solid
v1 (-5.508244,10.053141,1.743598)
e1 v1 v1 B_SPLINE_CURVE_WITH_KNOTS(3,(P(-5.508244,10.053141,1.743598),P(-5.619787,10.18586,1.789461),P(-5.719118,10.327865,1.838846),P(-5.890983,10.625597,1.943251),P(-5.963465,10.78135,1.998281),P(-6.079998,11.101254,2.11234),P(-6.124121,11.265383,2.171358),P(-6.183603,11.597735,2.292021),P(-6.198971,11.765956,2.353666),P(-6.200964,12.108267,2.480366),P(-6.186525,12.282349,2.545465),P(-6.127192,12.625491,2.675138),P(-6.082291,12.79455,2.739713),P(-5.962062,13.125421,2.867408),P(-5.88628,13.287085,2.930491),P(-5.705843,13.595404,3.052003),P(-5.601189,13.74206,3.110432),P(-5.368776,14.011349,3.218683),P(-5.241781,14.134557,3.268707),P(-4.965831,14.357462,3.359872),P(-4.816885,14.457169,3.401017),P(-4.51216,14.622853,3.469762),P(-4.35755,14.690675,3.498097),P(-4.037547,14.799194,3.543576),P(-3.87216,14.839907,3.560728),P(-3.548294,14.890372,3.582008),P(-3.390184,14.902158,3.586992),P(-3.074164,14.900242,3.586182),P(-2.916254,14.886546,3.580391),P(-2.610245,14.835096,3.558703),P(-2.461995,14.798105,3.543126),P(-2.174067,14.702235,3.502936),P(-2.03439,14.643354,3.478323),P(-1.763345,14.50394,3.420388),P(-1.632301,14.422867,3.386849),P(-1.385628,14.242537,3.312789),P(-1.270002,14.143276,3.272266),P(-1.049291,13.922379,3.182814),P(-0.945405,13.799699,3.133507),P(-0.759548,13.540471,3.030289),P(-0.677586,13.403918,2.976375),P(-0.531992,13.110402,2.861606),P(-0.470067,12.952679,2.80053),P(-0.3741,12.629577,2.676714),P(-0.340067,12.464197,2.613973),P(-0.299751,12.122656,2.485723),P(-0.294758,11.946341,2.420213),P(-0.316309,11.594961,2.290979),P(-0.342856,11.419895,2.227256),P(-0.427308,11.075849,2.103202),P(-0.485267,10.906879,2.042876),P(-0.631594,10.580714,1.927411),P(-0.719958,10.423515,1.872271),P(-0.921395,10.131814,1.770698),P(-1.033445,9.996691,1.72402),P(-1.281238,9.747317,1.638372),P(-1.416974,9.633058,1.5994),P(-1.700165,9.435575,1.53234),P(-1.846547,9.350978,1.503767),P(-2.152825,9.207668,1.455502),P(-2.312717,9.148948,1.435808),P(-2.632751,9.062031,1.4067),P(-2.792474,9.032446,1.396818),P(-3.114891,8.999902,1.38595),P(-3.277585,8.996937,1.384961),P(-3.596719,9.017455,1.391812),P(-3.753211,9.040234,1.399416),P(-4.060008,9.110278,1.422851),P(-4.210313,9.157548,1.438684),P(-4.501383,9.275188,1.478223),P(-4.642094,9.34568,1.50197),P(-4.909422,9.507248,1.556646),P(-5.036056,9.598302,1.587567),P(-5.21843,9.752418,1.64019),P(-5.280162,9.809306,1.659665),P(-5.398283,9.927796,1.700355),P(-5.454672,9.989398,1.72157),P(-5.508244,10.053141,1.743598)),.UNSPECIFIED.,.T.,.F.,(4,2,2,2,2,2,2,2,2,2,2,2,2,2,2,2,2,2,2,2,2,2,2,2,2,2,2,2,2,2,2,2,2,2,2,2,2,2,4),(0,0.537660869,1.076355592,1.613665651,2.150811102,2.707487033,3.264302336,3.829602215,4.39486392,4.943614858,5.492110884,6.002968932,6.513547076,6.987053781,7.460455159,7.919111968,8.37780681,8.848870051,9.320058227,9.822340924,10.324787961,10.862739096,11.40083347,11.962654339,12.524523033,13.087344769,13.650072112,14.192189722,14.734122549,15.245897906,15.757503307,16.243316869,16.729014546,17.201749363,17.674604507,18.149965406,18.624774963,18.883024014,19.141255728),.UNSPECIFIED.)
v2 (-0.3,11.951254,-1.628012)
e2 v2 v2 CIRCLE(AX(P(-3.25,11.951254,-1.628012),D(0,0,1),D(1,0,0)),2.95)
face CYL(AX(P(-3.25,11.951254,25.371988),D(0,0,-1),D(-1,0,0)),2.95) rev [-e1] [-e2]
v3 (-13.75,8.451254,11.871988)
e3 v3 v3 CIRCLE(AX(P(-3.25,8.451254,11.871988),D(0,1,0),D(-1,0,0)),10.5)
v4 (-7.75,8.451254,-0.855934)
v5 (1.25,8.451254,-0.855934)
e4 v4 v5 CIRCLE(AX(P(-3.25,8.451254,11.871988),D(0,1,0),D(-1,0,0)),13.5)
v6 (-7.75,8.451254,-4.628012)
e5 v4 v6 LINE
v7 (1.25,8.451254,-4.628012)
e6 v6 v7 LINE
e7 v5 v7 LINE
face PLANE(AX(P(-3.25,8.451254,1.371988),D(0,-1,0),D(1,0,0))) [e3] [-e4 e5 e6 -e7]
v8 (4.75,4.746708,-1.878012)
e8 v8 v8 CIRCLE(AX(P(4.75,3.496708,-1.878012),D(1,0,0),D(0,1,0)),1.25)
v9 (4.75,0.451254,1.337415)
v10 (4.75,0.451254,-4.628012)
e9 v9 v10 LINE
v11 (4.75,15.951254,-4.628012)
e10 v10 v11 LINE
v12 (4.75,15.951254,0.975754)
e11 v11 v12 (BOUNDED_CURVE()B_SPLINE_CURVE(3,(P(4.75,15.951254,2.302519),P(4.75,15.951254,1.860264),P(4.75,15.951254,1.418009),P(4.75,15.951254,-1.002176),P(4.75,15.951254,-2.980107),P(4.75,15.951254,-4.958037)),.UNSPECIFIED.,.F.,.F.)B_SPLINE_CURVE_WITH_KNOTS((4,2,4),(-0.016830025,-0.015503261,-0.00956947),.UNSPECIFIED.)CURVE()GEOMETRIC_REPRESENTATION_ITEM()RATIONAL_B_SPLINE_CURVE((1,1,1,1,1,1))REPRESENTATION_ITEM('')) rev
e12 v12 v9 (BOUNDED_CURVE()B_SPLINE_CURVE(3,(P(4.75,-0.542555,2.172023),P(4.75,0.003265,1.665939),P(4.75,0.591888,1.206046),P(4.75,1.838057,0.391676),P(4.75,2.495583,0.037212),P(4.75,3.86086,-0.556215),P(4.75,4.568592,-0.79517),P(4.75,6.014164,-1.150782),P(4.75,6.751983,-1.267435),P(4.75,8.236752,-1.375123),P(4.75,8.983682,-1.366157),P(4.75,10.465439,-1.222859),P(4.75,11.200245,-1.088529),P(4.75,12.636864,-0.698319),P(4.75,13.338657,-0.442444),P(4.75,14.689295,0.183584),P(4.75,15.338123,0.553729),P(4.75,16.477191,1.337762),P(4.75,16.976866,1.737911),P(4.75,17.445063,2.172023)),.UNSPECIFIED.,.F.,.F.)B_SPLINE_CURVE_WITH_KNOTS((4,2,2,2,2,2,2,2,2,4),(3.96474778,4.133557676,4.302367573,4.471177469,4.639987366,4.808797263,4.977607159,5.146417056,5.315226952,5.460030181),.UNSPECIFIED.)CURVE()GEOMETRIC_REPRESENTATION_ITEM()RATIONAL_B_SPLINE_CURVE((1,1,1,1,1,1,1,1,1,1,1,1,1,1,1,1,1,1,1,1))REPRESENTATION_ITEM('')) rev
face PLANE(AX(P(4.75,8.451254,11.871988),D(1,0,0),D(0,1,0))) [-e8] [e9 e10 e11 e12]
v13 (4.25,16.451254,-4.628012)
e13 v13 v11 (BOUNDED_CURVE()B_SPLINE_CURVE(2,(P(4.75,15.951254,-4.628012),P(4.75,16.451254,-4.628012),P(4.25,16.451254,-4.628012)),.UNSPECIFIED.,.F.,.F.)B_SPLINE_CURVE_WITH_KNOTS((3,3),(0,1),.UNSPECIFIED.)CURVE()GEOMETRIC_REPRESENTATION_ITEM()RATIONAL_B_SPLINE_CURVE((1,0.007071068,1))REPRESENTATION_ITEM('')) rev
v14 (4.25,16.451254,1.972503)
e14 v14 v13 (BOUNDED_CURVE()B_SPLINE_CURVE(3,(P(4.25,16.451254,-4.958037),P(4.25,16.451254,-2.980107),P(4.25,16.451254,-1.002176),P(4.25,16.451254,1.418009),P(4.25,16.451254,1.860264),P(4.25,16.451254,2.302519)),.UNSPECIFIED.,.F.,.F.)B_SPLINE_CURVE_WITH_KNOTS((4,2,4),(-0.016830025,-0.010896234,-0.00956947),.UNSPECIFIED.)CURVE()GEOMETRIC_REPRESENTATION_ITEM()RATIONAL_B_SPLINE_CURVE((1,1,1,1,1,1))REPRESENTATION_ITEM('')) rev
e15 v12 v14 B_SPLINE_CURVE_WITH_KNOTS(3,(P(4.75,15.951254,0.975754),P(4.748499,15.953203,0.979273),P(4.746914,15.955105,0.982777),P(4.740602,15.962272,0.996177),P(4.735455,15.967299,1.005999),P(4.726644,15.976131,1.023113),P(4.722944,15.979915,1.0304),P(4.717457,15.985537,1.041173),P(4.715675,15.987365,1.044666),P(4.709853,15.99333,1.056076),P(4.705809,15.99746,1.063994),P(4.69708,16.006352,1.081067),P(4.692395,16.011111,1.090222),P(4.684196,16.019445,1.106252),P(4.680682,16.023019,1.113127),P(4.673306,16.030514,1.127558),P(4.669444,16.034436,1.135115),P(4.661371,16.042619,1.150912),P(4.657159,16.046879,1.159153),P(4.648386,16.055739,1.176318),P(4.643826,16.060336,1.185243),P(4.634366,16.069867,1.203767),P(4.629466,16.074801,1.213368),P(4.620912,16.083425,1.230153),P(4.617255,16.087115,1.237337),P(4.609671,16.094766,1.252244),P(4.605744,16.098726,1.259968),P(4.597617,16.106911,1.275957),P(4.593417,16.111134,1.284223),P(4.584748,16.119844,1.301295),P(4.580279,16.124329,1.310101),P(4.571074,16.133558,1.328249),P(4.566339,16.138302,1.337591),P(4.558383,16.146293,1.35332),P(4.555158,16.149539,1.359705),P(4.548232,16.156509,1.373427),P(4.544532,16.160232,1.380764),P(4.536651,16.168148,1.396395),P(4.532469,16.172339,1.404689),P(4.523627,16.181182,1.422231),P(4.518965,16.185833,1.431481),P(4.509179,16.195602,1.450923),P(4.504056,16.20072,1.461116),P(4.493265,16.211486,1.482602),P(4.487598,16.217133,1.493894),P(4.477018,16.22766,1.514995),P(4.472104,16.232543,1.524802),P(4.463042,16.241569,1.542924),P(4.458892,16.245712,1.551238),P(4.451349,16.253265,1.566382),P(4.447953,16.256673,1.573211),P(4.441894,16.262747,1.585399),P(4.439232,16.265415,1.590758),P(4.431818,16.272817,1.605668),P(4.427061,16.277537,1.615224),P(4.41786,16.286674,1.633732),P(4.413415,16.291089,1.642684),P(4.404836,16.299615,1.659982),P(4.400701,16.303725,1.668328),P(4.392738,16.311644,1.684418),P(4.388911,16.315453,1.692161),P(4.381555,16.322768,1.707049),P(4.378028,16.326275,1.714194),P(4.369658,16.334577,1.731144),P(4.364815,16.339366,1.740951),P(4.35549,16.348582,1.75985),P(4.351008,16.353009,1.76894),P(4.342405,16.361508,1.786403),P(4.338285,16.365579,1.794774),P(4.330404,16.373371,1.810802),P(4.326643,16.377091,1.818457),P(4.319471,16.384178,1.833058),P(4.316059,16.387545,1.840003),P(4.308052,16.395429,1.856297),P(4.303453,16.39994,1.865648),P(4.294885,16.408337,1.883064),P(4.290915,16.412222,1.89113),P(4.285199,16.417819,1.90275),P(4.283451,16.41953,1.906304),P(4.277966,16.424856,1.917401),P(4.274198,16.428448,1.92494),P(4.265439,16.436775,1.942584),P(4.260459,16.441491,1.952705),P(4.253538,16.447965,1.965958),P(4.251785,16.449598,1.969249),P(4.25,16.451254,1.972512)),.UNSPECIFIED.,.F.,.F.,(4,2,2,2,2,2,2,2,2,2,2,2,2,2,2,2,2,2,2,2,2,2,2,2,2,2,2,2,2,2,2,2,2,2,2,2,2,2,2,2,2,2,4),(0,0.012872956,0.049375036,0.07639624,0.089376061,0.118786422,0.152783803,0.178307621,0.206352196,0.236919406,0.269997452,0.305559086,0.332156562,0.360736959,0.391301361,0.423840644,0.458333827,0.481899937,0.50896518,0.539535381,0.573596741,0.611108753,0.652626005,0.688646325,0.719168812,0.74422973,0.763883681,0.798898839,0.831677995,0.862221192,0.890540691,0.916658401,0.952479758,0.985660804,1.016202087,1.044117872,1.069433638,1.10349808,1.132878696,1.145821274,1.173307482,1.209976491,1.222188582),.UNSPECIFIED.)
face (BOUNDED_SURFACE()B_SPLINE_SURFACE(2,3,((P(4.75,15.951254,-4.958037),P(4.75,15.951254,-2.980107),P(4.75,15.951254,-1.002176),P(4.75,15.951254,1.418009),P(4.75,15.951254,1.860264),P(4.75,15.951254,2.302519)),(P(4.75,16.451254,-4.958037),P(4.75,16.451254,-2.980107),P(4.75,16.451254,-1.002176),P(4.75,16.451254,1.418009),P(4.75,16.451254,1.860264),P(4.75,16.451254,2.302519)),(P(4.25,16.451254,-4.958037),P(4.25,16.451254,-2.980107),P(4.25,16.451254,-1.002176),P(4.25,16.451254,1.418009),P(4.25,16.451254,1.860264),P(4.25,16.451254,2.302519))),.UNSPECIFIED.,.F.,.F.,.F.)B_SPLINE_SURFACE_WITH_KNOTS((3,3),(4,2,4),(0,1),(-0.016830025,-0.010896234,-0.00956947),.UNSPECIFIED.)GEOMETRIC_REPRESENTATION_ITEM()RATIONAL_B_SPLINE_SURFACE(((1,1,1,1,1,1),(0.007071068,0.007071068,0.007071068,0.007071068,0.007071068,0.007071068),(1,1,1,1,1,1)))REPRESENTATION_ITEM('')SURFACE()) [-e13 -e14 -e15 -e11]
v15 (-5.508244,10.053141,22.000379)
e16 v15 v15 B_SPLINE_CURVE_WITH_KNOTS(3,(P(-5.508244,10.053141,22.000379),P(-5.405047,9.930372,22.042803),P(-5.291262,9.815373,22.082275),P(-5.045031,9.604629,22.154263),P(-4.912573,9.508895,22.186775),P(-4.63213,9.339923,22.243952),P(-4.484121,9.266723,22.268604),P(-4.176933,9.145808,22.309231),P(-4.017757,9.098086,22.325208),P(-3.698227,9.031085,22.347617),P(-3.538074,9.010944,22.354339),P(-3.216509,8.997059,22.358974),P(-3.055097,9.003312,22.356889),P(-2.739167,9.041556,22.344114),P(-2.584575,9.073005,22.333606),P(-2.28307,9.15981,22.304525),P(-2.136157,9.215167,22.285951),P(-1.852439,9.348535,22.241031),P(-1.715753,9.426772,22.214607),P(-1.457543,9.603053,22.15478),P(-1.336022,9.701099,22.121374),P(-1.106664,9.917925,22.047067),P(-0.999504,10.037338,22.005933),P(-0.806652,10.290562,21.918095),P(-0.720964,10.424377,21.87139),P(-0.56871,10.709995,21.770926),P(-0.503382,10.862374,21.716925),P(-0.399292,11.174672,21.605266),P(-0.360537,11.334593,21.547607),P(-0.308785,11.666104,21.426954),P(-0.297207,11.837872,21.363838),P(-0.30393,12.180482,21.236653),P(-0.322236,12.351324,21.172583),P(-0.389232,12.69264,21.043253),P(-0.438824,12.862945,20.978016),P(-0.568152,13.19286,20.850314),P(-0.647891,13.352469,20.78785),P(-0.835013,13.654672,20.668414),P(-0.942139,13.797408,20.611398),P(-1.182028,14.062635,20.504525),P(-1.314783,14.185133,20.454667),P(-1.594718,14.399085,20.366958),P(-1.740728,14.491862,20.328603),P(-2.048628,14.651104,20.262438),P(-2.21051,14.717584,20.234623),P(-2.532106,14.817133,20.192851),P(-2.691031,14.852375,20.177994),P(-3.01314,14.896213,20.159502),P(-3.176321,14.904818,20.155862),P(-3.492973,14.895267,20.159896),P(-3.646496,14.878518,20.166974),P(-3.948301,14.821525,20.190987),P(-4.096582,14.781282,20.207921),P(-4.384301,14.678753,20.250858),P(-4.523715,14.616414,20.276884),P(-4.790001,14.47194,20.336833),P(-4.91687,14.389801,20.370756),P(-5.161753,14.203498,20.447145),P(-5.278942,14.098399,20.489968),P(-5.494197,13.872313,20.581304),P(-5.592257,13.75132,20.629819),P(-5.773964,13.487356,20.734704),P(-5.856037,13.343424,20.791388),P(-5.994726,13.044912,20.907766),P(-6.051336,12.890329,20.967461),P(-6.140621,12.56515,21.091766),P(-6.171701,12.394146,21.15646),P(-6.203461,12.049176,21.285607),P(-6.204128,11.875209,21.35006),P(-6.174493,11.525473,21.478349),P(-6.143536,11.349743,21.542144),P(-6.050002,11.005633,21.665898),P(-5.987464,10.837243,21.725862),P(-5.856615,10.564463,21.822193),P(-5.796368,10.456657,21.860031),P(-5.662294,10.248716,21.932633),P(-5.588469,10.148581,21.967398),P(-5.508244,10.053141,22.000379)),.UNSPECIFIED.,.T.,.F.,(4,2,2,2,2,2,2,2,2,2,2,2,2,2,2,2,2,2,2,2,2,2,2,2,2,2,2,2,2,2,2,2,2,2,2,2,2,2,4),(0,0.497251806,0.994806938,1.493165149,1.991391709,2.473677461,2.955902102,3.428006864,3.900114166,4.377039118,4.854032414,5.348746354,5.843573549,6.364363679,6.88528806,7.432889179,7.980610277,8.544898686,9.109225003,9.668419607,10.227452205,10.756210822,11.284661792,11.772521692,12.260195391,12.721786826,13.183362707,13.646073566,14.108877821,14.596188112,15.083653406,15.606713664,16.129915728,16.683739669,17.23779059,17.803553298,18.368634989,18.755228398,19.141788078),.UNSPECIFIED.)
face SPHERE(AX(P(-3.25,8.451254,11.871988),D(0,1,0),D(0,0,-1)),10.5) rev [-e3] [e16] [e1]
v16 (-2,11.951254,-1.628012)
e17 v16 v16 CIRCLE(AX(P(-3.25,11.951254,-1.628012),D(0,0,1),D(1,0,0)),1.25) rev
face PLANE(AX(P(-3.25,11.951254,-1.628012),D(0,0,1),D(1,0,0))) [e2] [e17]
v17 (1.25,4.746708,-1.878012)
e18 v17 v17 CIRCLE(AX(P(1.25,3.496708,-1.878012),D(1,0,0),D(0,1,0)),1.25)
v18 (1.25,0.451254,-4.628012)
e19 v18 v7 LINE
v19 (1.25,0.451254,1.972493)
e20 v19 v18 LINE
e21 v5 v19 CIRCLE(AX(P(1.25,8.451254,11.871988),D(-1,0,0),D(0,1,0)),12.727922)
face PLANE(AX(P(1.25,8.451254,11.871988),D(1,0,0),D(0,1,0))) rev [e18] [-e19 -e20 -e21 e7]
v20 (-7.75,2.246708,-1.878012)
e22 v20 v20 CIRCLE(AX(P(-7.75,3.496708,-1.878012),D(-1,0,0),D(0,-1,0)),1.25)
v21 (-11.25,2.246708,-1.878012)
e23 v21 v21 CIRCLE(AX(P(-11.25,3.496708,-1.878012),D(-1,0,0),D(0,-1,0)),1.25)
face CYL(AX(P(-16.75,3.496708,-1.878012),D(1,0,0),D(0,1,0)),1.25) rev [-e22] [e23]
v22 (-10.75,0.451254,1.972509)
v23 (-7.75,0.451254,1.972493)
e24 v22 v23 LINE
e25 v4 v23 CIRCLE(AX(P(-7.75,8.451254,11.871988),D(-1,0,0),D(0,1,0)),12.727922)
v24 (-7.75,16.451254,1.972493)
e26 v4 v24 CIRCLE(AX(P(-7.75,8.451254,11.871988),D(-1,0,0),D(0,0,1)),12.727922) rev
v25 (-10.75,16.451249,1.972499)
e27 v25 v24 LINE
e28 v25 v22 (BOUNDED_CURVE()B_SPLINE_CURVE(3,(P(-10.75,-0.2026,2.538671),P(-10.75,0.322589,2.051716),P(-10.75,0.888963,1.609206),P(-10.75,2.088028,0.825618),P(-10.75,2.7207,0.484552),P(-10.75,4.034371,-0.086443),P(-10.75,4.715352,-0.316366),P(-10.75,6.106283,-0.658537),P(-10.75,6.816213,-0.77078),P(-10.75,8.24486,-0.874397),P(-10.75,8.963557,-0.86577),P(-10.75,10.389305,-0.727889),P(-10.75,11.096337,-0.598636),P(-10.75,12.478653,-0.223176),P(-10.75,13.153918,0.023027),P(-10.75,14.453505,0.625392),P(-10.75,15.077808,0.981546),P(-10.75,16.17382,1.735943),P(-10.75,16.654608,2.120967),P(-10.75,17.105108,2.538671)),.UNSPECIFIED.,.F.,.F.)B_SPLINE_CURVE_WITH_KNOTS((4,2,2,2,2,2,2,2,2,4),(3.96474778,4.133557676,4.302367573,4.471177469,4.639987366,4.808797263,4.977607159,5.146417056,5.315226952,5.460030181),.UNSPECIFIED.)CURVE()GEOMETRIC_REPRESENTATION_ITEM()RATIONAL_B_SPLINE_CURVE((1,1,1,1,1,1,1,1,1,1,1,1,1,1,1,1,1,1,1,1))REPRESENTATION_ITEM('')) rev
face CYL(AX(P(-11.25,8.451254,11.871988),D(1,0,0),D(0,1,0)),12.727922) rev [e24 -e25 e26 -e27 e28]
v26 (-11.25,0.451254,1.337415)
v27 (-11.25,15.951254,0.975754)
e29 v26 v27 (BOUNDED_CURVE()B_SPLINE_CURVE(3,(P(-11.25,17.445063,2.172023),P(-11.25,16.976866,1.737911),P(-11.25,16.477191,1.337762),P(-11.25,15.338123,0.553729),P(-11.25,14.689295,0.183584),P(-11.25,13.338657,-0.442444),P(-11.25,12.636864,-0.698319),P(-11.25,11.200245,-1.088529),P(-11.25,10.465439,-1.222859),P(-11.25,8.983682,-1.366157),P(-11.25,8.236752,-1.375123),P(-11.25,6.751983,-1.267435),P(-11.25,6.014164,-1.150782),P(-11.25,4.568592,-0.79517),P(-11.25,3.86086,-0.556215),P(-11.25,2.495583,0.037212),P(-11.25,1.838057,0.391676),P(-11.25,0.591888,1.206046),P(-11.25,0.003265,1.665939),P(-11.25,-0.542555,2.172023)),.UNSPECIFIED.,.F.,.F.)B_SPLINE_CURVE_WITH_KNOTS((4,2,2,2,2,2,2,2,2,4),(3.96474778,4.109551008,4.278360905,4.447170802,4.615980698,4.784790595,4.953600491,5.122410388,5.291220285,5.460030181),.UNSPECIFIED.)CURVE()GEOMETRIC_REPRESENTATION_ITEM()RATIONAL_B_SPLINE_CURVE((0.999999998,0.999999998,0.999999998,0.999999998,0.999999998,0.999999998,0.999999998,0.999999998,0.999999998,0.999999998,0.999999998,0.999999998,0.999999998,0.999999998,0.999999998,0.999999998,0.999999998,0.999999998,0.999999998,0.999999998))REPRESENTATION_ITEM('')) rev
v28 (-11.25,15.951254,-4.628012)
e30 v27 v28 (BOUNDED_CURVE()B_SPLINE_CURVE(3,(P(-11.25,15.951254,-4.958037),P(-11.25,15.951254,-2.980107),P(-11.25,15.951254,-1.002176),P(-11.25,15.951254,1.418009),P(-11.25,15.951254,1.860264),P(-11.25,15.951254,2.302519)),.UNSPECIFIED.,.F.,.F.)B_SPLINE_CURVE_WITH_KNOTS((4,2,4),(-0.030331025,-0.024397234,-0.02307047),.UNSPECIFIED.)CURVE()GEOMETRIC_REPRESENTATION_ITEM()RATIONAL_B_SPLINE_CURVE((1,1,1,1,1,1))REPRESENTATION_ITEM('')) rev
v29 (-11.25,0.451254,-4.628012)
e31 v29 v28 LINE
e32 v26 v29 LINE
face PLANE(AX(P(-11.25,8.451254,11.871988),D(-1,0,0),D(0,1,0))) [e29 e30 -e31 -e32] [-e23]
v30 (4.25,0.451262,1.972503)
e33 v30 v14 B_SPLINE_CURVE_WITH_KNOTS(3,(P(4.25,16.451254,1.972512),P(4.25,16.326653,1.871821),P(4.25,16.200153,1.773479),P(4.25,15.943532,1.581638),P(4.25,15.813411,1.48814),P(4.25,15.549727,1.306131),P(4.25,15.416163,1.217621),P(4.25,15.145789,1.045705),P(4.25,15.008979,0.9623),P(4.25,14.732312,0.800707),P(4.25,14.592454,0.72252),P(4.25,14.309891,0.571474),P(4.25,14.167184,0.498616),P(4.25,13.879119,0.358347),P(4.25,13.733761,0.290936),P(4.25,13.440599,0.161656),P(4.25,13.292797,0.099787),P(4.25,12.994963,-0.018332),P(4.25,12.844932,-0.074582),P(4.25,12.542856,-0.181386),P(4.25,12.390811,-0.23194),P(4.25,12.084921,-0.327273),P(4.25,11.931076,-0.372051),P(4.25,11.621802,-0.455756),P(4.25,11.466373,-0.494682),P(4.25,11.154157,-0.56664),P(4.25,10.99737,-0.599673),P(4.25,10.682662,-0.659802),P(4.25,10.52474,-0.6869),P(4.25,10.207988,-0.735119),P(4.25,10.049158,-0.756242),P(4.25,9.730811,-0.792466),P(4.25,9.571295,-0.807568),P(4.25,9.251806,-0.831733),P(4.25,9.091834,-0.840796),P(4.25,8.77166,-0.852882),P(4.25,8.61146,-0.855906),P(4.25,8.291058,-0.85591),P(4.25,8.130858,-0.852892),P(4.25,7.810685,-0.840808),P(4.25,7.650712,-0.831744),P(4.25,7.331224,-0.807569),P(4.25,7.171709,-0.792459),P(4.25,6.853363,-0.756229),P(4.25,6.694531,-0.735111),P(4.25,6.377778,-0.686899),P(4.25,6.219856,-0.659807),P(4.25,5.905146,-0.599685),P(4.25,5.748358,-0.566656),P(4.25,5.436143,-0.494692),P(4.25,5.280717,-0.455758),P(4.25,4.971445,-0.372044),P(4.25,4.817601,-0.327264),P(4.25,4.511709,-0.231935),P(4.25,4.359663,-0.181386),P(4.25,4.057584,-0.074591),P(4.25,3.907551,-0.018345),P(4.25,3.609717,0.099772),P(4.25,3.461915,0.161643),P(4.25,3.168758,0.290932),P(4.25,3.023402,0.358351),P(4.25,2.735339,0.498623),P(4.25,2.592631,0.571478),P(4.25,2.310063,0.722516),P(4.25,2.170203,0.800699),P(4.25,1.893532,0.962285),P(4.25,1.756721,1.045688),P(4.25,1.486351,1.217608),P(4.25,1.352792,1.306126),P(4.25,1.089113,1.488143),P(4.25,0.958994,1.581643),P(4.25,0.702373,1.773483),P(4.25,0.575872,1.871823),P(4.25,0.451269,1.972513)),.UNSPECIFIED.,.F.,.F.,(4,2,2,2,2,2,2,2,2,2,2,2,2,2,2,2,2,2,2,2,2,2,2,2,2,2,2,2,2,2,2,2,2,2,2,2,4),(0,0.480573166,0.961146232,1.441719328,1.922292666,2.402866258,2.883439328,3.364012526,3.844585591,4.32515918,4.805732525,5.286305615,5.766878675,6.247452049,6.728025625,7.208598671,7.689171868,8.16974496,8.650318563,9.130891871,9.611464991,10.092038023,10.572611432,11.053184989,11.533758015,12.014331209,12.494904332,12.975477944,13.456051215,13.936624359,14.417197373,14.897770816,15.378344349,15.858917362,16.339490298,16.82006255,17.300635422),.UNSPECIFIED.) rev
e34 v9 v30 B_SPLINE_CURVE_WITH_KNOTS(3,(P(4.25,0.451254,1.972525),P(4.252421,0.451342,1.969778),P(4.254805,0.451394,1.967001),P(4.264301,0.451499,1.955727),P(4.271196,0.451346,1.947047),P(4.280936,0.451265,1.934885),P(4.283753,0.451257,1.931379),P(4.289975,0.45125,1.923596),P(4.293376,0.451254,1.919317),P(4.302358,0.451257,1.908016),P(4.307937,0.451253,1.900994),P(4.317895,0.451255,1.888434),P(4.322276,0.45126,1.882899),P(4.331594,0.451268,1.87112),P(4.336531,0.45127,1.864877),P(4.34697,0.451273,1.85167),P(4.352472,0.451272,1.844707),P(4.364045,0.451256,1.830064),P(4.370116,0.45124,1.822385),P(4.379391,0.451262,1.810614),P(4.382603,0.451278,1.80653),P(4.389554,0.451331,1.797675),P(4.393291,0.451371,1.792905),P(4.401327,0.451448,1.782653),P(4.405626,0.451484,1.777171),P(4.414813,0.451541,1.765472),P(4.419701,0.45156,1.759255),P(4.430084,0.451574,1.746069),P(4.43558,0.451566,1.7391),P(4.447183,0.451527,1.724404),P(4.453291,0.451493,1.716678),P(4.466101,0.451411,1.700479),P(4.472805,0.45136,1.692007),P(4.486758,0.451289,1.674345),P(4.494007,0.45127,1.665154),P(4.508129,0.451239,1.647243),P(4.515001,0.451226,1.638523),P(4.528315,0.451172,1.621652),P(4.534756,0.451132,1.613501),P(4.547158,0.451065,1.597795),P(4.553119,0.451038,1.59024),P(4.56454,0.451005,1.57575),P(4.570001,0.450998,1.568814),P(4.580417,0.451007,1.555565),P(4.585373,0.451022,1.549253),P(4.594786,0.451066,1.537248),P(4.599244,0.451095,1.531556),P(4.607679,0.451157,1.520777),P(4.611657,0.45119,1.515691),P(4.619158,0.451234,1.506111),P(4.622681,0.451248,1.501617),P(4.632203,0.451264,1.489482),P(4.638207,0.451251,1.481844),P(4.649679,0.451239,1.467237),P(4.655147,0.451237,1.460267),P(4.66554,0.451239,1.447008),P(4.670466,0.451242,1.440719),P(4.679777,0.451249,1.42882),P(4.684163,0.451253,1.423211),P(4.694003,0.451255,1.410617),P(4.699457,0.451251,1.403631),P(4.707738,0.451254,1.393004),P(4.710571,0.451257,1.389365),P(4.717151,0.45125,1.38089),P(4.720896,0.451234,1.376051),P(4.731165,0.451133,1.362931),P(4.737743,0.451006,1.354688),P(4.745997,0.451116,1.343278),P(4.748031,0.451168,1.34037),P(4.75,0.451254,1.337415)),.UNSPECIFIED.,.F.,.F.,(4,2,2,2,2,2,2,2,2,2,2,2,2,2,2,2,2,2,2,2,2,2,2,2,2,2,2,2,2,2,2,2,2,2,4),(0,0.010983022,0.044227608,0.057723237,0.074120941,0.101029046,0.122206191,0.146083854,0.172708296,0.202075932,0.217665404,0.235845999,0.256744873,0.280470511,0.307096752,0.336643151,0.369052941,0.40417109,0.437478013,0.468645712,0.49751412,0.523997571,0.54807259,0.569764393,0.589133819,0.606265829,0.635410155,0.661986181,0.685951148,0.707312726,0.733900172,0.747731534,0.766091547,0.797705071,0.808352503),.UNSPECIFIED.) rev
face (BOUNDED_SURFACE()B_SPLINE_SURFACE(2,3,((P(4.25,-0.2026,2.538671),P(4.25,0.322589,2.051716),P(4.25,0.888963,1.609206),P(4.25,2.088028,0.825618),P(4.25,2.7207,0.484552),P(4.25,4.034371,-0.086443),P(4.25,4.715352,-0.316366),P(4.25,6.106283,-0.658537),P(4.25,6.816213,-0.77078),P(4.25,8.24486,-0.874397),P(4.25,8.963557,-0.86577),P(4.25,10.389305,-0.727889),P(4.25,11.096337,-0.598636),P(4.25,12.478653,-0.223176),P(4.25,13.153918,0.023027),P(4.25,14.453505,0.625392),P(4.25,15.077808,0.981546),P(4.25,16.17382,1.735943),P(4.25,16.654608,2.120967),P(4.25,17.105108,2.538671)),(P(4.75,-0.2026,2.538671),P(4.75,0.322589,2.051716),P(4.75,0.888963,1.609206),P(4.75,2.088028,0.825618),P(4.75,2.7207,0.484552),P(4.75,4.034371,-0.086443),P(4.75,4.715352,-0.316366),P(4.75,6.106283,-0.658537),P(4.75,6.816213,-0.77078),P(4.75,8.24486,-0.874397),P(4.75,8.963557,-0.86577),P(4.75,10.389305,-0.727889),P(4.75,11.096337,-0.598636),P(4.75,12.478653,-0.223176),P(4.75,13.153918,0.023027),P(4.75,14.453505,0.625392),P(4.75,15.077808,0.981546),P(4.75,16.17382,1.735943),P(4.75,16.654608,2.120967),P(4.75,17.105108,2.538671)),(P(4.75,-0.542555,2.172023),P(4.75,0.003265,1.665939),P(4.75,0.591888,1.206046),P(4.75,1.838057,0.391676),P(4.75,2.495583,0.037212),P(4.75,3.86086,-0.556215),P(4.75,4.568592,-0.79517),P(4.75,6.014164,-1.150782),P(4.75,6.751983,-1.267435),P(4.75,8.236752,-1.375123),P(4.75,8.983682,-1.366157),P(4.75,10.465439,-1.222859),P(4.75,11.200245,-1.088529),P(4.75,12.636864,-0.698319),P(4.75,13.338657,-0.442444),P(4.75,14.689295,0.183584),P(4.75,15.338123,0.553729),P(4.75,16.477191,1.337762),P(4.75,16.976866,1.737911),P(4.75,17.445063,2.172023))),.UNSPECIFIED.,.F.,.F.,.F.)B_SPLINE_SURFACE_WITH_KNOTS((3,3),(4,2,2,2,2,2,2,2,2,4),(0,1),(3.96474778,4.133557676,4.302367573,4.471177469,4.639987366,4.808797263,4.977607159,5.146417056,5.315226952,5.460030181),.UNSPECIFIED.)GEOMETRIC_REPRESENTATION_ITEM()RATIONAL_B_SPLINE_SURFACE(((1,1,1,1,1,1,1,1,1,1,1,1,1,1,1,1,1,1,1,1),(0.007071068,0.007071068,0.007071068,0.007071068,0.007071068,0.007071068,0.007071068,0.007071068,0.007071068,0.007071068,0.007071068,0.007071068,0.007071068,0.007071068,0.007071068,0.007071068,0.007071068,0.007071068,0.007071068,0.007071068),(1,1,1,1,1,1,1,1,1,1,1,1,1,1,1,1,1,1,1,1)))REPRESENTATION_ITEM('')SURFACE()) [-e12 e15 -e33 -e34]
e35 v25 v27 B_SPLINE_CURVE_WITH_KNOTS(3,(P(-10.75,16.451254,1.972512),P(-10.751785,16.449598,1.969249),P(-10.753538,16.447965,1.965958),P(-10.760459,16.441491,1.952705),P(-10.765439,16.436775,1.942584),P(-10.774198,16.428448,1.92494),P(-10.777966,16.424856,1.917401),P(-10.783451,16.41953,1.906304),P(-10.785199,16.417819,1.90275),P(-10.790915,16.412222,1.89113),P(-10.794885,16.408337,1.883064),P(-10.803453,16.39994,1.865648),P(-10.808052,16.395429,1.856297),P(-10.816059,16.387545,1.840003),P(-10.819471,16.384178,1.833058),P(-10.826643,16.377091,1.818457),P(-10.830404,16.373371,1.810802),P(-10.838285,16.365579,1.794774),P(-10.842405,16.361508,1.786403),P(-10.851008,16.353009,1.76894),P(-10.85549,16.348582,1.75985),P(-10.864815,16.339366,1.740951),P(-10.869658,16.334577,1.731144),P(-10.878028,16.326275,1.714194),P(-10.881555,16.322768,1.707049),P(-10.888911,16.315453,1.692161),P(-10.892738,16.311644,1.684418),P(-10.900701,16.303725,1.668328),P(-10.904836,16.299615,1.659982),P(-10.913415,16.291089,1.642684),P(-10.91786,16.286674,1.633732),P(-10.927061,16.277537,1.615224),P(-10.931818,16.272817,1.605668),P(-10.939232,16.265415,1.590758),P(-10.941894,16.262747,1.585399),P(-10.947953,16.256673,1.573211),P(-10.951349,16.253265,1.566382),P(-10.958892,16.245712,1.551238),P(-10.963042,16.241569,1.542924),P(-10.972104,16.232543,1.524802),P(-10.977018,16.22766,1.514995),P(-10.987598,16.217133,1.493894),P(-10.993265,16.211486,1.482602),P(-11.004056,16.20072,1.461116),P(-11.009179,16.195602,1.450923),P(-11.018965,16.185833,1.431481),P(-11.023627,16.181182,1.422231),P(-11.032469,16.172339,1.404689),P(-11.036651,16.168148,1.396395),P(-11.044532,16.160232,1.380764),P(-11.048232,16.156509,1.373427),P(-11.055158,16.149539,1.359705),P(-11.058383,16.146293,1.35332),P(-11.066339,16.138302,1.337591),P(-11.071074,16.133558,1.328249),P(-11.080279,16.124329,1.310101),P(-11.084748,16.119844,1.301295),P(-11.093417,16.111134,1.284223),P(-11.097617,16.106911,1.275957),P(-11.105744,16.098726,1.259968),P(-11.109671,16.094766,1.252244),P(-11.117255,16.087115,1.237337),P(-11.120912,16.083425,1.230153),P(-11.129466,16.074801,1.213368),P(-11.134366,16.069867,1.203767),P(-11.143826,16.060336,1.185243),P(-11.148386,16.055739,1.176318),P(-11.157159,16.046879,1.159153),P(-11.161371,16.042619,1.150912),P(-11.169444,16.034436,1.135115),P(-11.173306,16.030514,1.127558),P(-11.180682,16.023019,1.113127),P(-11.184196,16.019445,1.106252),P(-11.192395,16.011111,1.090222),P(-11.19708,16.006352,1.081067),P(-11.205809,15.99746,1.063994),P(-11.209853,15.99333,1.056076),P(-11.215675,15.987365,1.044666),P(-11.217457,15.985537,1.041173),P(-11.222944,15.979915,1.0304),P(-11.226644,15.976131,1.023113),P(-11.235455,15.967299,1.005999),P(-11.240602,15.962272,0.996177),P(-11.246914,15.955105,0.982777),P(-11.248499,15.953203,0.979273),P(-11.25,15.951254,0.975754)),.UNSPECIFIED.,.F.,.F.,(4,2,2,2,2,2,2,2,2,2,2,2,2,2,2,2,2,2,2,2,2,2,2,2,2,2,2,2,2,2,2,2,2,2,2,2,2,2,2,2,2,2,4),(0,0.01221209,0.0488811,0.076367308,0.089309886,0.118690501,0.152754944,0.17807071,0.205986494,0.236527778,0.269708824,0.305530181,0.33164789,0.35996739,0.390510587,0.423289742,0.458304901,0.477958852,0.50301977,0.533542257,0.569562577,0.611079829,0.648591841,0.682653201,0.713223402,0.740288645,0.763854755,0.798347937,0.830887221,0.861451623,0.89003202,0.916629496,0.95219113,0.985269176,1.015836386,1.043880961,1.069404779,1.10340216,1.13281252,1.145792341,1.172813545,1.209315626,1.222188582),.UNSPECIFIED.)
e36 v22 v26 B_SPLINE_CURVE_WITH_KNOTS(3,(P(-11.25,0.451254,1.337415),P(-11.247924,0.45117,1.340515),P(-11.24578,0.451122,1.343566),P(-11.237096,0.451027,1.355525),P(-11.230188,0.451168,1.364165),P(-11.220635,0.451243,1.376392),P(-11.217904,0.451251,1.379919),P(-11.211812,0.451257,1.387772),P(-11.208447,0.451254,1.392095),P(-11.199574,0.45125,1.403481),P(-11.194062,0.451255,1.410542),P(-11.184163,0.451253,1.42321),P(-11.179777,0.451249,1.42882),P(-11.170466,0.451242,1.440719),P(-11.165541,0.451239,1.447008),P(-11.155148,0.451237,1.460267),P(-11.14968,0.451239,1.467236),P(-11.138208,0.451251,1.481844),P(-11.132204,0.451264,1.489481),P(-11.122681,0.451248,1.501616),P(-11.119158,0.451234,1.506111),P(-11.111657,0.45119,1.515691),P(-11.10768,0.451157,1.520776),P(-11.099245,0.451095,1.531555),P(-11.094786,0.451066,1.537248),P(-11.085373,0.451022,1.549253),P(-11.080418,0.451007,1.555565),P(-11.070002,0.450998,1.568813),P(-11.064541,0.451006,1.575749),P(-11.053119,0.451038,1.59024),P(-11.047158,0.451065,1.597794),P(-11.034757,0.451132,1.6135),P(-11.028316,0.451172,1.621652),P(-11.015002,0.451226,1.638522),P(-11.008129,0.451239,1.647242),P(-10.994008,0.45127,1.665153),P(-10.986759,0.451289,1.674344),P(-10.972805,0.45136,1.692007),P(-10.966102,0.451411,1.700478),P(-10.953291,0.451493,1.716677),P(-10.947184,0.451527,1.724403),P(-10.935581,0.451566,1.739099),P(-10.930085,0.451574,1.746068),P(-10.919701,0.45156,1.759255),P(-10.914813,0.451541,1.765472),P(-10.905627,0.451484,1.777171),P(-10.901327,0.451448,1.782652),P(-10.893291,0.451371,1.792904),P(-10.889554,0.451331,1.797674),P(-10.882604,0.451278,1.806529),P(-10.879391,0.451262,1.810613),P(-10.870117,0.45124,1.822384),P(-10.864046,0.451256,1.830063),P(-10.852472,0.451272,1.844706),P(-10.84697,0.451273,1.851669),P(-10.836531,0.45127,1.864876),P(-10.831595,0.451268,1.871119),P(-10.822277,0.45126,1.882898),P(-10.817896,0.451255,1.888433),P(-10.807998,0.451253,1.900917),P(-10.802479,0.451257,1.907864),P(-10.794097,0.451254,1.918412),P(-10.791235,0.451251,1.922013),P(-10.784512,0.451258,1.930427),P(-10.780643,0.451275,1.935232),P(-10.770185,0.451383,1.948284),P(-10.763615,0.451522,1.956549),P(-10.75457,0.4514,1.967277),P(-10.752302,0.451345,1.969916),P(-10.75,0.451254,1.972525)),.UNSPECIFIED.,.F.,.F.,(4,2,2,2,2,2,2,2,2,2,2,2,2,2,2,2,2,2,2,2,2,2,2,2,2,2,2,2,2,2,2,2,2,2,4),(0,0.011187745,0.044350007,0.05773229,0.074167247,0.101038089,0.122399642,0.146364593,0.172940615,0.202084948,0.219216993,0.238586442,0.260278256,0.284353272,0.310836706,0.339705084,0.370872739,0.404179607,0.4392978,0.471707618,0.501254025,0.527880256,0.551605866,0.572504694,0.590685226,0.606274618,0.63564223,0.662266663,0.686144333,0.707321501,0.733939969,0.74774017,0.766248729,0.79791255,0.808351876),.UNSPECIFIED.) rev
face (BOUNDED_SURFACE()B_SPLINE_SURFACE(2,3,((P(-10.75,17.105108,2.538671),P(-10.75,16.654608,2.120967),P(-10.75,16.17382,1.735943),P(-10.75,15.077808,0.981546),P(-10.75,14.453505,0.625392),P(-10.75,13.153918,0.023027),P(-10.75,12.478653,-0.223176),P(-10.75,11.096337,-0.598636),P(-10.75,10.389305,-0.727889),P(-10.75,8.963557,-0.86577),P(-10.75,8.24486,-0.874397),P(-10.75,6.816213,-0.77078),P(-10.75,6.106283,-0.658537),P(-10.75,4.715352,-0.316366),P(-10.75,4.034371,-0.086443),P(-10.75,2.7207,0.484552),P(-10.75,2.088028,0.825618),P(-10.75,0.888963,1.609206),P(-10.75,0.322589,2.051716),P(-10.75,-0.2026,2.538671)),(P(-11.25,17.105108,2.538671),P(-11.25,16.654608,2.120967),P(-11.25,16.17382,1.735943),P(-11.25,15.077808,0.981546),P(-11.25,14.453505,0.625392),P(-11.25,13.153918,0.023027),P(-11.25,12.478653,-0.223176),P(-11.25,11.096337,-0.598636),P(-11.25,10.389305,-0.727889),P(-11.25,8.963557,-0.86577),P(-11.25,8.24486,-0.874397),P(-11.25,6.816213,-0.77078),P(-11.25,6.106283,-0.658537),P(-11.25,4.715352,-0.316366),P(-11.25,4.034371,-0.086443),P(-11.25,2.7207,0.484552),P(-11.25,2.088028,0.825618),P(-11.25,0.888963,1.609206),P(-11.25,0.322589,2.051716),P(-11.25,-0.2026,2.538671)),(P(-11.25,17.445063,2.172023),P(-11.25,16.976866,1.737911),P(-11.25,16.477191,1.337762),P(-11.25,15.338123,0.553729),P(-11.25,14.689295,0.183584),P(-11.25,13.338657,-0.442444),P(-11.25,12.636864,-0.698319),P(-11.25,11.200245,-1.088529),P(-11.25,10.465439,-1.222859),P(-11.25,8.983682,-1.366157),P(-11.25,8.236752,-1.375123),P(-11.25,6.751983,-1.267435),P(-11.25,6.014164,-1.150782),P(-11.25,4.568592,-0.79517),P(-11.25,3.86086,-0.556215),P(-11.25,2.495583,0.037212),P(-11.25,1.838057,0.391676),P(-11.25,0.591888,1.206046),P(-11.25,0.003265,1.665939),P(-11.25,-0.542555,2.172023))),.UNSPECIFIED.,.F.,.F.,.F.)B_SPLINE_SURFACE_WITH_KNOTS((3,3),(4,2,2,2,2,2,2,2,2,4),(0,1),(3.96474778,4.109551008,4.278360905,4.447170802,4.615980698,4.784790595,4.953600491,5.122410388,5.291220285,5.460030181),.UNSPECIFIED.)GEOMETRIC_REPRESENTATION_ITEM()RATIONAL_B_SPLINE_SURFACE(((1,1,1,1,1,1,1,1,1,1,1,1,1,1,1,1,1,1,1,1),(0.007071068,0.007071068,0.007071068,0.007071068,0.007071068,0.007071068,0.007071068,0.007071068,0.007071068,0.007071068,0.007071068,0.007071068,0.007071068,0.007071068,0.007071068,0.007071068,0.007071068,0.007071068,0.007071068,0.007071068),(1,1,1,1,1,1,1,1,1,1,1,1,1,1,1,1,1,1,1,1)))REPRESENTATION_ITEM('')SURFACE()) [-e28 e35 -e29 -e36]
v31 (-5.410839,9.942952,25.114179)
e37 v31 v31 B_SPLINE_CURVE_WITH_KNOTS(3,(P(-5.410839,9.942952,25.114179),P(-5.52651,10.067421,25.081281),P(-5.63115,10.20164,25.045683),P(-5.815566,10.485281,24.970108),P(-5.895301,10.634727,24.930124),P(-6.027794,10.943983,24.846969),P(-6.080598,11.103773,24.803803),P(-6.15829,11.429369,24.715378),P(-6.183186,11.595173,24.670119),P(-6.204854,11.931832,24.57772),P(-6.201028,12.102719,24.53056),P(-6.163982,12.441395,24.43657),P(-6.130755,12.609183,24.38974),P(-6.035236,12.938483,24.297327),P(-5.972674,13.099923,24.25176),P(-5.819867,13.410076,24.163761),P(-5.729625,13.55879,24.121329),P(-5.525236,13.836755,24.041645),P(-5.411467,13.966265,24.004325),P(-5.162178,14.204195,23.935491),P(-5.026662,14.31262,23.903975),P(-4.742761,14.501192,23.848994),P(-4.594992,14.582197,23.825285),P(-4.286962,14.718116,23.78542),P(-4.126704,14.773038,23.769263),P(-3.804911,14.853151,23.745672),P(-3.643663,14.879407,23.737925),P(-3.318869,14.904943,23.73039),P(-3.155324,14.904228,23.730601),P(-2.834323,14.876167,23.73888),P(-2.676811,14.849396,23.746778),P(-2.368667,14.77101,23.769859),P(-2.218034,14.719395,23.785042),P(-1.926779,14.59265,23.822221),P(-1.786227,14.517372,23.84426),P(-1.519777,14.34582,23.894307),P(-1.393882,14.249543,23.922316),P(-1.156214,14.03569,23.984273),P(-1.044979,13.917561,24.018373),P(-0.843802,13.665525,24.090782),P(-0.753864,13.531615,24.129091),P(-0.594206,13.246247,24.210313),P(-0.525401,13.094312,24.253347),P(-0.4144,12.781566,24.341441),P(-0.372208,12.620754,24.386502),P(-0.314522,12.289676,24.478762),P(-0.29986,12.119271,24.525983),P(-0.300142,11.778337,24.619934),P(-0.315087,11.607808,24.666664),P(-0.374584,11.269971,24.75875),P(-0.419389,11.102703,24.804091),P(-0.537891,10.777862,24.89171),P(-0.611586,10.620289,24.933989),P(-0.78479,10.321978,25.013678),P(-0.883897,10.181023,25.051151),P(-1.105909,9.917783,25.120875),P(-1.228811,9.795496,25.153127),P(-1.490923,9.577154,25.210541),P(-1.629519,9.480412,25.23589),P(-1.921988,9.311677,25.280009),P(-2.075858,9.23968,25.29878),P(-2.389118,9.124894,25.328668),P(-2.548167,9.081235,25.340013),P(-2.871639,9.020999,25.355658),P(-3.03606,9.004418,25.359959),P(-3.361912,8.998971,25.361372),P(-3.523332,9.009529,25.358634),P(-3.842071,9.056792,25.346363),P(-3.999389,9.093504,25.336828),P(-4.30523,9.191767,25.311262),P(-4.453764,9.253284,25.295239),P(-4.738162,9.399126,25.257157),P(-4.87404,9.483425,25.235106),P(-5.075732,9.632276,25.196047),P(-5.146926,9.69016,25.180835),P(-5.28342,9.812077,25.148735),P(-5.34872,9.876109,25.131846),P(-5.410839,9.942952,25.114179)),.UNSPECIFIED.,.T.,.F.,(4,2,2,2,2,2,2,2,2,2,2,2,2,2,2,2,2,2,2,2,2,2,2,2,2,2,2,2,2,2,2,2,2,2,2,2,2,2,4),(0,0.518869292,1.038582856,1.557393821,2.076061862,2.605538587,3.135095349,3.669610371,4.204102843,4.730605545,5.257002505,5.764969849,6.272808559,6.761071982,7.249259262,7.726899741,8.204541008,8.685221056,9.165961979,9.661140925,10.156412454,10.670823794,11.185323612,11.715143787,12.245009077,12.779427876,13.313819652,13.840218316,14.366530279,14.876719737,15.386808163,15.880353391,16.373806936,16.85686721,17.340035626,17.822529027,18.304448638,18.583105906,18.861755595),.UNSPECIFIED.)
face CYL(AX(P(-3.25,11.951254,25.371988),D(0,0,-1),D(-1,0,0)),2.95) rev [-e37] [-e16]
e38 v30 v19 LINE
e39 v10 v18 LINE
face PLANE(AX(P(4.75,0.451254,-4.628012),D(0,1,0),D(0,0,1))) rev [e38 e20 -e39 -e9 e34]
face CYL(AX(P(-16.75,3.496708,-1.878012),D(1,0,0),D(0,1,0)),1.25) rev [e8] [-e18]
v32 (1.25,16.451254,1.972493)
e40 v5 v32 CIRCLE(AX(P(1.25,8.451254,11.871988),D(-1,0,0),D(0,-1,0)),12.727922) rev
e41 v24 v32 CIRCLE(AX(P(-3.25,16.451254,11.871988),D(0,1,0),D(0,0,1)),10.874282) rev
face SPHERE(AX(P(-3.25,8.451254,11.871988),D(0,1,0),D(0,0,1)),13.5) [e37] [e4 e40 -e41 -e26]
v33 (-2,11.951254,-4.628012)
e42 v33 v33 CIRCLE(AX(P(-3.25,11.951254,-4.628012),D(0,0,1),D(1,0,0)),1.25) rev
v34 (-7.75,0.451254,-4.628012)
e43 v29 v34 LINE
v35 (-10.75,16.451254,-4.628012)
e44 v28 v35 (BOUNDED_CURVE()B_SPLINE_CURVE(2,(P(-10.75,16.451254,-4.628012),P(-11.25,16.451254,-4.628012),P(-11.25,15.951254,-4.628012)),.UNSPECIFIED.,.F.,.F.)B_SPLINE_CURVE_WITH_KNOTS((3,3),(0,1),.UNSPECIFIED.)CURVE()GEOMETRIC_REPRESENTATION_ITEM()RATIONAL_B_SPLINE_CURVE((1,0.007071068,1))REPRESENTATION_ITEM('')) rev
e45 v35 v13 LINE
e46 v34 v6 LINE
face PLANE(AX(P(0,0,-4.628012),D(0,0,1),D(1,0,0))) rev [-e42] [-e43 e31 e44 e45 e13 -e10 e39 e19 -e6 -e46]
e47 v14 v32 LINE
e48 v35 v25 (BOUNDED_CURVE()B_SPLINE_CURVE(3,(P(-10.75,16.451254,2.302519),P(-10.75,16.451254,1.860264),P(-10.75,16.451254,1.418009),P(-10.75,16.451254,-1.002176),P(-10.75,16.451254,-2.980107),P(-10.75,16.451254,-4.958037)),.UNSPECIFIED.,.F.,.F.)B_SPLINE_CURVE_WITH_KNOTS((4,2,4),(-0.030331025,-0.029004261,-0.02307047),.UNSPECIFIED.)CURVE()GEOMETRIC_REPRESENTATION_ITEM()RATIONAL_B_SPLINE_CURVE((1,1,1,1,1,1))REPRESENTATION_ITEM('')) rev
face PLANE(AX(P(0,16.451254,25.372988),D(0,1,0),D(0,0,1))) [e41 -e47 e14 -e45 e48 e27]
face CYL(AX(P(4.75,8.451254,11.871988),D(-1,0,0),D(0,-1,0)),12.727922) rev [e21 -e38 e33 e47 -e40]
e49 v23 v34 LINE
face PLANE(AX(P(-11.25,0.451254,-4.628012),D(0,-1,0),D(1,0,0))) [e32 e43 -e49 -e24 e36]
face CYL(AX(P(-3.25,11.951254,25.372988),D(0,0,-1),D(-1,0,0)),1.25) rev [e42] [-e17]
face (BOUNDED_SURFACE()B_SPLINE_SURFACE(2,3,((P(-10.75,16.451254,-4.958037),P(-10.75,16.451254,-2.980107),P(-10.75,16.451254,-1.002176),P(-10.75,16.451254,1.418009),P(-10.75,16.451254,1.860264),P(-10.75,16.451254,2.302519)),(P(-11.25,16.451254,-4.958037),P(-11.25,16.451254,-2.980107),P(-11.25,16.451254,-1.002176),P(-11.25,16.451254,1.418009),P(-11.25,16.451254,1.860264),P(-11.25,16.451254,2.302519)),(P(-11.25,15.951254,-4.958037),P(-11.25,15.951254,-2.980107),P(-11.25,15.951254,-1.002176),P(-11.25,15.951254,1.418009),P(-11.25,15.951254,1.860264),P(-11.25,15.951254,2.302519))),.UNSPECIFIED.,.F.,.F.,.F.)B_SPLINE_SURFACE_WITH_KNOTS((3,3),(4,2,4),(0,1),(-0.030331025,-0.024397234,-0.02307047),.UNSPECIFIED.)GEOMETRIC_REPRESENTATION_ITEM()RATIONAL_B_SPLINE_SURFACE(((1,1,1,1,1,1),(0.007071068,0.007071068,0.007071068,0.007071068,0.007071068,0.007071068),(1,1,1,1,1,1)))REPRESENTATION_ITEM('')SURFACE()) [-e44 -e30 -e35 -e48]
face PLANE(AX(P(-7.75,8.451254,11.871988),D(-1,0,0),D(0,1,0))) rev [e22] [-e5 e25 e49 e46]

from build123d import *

# Parameters (mm, degrees)
BOSS_EXTRUDE1_REACH      = 42.773
BOSS_EXTRUDE1_END_RADIUS = 13.5
SKETCH3_W                = 9
SKETCH3_H                = 8
SKETCH3_R                = 1.25
SKETCH4_R                = 2.95
CUT_EXTRUDE1_DEPTH       = 39.618907907
BOSS_EXTRUDE2_DEPTH      = 3.5
FILLET1_SIZE             = 0.5
FILLET1_OF_MIRROR1_SIZE  = 0.5
SKETCH6_R                = 1.25
CUT_EXTRUDE2_DEPTH       = 40.847777024


with BuildPart() as part:
    # Sketch2 → Revolve1 (revolve)
    with BuildSketch(Plane.ZY.offset(3.25)):
        with BuildLine():
            Line((11.871988211, 18.951253904), (11.871988211, 21.951253904))
            ThreePointArc((11.871988211, 21.951253904), (2.326046665, 17.99719545), (-1.628011789, 8.451253904))
            Line((-1.628011789, 8.451253904), (1.371988211, 8.451253904))
            ThreePointArc((1.371988211, 8.451253904), (4.447367009, 15.875875106), (11.871988211, 18.951253904))
        make_face()
    revolve(axis=Axis((-3.25, 21.951253904, 11.871988211), (0, -1, 0)))

    # Boss-Extrude1: up to this sphere (the profile starts outside it)
    boss_extrude1_end = Location((-3.25, 8.451253904, 11.871988211)) * Sphere(BOSS_EXTRUDE1_END_RADIUS, mode=Mode.PRIVATE)
    # Sketch3 → Boss-Extrude1 (add, up to the surface)
    with BuildSketch(Plane.XY.offset(-4.628011789), mode=Mode.PRIVATE) as boss_extrude1_sk1:
        with Locations((-3.25, 12.451253904)):
            Rectangle(SKETCH3_W, SKETCH3_H)
        with Locations(Location((-3.25, 11.951253904, 0), (0, 0, 234.39930335))):
            Circle(SKETCH3_R, mode=Mode.SUBTRACT)
    boss_extrude1_tool1 = extrude(boss_extrude1_sk1.sketch, amount=BOSS_EXTRUDE1_REACH, mode=Mode.PRIVATE) - boss_extrude1_end
    add(boss_extrude1_tool1.solids().sort_by_distance((-3.25, 8.57167, -4.628012))[0])

    # Sketch4 → Cut-Extrude1 (cut, through all)
    with BuildSketch(Plane.XY.offset(-1.628011789)):
        with Locations(Location((-3.25, 11.951253904, 0), (0, 0, 220.0479249))):
            Circle(SKETCH4_R)
    extrude(amount=CUT_EXTRUDE1_DEPTH, mode=Mode.SUBTRACT)

    # Sketch5 → Boss-Extrude2 (add)
    with BuildSketch(Plane(origin=(1.25, 0, 0), x_dir=(0, 0, -1), z_dir=(1, 0, 0))):
        with BuildLine():
            Line((4.628011789, 16.451253904), (-1.972493274, 16.451253904))
            ThreePointArc((-1.972493274, 16.451253904), (0.128011789, 12.693894591), (0.85593385, 8.451253904))
            ThreePointArc((0.85593385, 8.451253904), (0.128011789, 4.208613217), (-1.972493274, 0.451253904))
            Line((-1.972493274, 0.451253904), (4.628011789, 0.451253904))
            Line((4.628011789, 0.451253904), (4.628011789, 16.451253904))
        make_face()
    boss_extrude2 = extrude(amount=BOSS_EXTRUDE2_DEPTH)

    # Fillet1
    # a fillet whose section is not a circle: 0.5 mm, written as the material it takes off along each edge
    with BuildSketch(Plane(origin=(4.75, 16.451253904, -5.878011789), x_dir=(0, -1, 0), z_dir=(0, 0, 1))) as fillet1_piece_1:
        with BuildLine():
            Bezier((FILLET1_SIZE, 0), (0, 0), (0, -FILLET1_SIZE), weights=[1, 0.007071068, 1])
            Line((0, -FILLET1_SIZE), (0, 0))
            Line((0, 0), (FILLET1_SIZE, 0))
        make_face()
    extrude(amount=9.100505063, mode=Mode.SUBTRACT)
    with BuildSketch(Plane(origin=(4.75, 8.451253904, 11.871988211), x_dir=(0, -0.701793953553333, -0.7123799876161475), z_dir=(0, -0.7123799876161475, 0.701793953553333))) as fillet1_piece_2:
        with BuildLine():
            Bezier((12.727922061 + FILLET1_SIZE, 0), (12.727922061, 0), (12.727922061, -FILLET1_SIZE), weights=[1, 0.007071068, 1])
            Line((12.727922061, -FILLET1_SIZE), (12.727922061, 0))
            Line((12.727922061, 0), (12.727922061 + FILLET1_SIZE, 0))
        make_face()
    revolve(axis=Axis((4.75, 8.451253904, 11.871988211), (1, 0, 0)), revolution_arc=89.142221862, mode=Mode.SUBTRACT)

    # Mirror1: Boss-Extrude2 across plane
    add(boss_extrude2.mirror(Plane.ZY.offset(3.25)))

    # Fillet1 of Mirror1
    # a fillet whose section is not a circle: 0.5 mm, written as the material it takes off along each edge
    with BuildSketch(Plane(origin=(-11.25, 16.451253904, -5.878011789), x_dir=(1, 0, 0), z_dir=(0, 0, 1))) as fillet1_of_mirror1_piece_1:
        with BuildLine():
            Bezier((FILLET1_OF_MIRROR1_SIZE, 0), (0, 0), (0, -FILLET1_OF_MIRROR1_SIZE), weights=[1, 0.007071068, 1])
            Line((0, -FILLET1_OF_MIRROR1_SIZE), (0, 0))
            Line((0, 0), (FILLET1_OF_MIRROR1_SIZE, 0))
        make_face()
    extrude(amount=9.100505063, mode=Mode.SUBTRACT)
    with BuildSketch(Plane(origin=(-11.25, 8.451253904, 11.871988211), x_dir=(9.769464187365758e-15, -0.701793953553333, -0.7123799876161475), z_dir=(9.869955665254962e-15, -0.7123799876161475, 0.701793953553333))) as fillet1_of_mirror1_piece_2:
        with BuildLine():
            Bezier((12.727922061 + FILLET1_OF_MIRROR1_SIZE, 0), (12.727922061, 0), (12.727922061, FILLET1_OF_MIRROR1_SIZE), weights=[1, 0.007071068, 1])
            Line((12.727922061, FILLET1_OF_MIRROR1_SIZE), (12.727922061, 0))
            Line((12.727922061, 0), (12.727922061 + FILLET1_OF_MIRROR1_SIZE, 0))
        make_face()
    revolve(axis=Axis((-11.25, 8.451253904, 11.871988211), (1, 0, 0)), revolution_arc=89.142221862, mode=Mode.SUBTRACT)

    # Sketch6 → Cut-Extrude2 (cut, through all)
    with BuildSketch(Plane(origin=(4.75, 0, 0), x_dir=(0, 0, -1), z_dir=(1, 0, 0))):
        with Locations(Location((1.878011789, 3.496708449, 0), (0, 0, 270))):
            Circle(SKETCH6_R)
    extrude(amount=-CUT_EXTRUDE2_DEPTH, mode=Mode.SUBTRACT)


solid = part.part
